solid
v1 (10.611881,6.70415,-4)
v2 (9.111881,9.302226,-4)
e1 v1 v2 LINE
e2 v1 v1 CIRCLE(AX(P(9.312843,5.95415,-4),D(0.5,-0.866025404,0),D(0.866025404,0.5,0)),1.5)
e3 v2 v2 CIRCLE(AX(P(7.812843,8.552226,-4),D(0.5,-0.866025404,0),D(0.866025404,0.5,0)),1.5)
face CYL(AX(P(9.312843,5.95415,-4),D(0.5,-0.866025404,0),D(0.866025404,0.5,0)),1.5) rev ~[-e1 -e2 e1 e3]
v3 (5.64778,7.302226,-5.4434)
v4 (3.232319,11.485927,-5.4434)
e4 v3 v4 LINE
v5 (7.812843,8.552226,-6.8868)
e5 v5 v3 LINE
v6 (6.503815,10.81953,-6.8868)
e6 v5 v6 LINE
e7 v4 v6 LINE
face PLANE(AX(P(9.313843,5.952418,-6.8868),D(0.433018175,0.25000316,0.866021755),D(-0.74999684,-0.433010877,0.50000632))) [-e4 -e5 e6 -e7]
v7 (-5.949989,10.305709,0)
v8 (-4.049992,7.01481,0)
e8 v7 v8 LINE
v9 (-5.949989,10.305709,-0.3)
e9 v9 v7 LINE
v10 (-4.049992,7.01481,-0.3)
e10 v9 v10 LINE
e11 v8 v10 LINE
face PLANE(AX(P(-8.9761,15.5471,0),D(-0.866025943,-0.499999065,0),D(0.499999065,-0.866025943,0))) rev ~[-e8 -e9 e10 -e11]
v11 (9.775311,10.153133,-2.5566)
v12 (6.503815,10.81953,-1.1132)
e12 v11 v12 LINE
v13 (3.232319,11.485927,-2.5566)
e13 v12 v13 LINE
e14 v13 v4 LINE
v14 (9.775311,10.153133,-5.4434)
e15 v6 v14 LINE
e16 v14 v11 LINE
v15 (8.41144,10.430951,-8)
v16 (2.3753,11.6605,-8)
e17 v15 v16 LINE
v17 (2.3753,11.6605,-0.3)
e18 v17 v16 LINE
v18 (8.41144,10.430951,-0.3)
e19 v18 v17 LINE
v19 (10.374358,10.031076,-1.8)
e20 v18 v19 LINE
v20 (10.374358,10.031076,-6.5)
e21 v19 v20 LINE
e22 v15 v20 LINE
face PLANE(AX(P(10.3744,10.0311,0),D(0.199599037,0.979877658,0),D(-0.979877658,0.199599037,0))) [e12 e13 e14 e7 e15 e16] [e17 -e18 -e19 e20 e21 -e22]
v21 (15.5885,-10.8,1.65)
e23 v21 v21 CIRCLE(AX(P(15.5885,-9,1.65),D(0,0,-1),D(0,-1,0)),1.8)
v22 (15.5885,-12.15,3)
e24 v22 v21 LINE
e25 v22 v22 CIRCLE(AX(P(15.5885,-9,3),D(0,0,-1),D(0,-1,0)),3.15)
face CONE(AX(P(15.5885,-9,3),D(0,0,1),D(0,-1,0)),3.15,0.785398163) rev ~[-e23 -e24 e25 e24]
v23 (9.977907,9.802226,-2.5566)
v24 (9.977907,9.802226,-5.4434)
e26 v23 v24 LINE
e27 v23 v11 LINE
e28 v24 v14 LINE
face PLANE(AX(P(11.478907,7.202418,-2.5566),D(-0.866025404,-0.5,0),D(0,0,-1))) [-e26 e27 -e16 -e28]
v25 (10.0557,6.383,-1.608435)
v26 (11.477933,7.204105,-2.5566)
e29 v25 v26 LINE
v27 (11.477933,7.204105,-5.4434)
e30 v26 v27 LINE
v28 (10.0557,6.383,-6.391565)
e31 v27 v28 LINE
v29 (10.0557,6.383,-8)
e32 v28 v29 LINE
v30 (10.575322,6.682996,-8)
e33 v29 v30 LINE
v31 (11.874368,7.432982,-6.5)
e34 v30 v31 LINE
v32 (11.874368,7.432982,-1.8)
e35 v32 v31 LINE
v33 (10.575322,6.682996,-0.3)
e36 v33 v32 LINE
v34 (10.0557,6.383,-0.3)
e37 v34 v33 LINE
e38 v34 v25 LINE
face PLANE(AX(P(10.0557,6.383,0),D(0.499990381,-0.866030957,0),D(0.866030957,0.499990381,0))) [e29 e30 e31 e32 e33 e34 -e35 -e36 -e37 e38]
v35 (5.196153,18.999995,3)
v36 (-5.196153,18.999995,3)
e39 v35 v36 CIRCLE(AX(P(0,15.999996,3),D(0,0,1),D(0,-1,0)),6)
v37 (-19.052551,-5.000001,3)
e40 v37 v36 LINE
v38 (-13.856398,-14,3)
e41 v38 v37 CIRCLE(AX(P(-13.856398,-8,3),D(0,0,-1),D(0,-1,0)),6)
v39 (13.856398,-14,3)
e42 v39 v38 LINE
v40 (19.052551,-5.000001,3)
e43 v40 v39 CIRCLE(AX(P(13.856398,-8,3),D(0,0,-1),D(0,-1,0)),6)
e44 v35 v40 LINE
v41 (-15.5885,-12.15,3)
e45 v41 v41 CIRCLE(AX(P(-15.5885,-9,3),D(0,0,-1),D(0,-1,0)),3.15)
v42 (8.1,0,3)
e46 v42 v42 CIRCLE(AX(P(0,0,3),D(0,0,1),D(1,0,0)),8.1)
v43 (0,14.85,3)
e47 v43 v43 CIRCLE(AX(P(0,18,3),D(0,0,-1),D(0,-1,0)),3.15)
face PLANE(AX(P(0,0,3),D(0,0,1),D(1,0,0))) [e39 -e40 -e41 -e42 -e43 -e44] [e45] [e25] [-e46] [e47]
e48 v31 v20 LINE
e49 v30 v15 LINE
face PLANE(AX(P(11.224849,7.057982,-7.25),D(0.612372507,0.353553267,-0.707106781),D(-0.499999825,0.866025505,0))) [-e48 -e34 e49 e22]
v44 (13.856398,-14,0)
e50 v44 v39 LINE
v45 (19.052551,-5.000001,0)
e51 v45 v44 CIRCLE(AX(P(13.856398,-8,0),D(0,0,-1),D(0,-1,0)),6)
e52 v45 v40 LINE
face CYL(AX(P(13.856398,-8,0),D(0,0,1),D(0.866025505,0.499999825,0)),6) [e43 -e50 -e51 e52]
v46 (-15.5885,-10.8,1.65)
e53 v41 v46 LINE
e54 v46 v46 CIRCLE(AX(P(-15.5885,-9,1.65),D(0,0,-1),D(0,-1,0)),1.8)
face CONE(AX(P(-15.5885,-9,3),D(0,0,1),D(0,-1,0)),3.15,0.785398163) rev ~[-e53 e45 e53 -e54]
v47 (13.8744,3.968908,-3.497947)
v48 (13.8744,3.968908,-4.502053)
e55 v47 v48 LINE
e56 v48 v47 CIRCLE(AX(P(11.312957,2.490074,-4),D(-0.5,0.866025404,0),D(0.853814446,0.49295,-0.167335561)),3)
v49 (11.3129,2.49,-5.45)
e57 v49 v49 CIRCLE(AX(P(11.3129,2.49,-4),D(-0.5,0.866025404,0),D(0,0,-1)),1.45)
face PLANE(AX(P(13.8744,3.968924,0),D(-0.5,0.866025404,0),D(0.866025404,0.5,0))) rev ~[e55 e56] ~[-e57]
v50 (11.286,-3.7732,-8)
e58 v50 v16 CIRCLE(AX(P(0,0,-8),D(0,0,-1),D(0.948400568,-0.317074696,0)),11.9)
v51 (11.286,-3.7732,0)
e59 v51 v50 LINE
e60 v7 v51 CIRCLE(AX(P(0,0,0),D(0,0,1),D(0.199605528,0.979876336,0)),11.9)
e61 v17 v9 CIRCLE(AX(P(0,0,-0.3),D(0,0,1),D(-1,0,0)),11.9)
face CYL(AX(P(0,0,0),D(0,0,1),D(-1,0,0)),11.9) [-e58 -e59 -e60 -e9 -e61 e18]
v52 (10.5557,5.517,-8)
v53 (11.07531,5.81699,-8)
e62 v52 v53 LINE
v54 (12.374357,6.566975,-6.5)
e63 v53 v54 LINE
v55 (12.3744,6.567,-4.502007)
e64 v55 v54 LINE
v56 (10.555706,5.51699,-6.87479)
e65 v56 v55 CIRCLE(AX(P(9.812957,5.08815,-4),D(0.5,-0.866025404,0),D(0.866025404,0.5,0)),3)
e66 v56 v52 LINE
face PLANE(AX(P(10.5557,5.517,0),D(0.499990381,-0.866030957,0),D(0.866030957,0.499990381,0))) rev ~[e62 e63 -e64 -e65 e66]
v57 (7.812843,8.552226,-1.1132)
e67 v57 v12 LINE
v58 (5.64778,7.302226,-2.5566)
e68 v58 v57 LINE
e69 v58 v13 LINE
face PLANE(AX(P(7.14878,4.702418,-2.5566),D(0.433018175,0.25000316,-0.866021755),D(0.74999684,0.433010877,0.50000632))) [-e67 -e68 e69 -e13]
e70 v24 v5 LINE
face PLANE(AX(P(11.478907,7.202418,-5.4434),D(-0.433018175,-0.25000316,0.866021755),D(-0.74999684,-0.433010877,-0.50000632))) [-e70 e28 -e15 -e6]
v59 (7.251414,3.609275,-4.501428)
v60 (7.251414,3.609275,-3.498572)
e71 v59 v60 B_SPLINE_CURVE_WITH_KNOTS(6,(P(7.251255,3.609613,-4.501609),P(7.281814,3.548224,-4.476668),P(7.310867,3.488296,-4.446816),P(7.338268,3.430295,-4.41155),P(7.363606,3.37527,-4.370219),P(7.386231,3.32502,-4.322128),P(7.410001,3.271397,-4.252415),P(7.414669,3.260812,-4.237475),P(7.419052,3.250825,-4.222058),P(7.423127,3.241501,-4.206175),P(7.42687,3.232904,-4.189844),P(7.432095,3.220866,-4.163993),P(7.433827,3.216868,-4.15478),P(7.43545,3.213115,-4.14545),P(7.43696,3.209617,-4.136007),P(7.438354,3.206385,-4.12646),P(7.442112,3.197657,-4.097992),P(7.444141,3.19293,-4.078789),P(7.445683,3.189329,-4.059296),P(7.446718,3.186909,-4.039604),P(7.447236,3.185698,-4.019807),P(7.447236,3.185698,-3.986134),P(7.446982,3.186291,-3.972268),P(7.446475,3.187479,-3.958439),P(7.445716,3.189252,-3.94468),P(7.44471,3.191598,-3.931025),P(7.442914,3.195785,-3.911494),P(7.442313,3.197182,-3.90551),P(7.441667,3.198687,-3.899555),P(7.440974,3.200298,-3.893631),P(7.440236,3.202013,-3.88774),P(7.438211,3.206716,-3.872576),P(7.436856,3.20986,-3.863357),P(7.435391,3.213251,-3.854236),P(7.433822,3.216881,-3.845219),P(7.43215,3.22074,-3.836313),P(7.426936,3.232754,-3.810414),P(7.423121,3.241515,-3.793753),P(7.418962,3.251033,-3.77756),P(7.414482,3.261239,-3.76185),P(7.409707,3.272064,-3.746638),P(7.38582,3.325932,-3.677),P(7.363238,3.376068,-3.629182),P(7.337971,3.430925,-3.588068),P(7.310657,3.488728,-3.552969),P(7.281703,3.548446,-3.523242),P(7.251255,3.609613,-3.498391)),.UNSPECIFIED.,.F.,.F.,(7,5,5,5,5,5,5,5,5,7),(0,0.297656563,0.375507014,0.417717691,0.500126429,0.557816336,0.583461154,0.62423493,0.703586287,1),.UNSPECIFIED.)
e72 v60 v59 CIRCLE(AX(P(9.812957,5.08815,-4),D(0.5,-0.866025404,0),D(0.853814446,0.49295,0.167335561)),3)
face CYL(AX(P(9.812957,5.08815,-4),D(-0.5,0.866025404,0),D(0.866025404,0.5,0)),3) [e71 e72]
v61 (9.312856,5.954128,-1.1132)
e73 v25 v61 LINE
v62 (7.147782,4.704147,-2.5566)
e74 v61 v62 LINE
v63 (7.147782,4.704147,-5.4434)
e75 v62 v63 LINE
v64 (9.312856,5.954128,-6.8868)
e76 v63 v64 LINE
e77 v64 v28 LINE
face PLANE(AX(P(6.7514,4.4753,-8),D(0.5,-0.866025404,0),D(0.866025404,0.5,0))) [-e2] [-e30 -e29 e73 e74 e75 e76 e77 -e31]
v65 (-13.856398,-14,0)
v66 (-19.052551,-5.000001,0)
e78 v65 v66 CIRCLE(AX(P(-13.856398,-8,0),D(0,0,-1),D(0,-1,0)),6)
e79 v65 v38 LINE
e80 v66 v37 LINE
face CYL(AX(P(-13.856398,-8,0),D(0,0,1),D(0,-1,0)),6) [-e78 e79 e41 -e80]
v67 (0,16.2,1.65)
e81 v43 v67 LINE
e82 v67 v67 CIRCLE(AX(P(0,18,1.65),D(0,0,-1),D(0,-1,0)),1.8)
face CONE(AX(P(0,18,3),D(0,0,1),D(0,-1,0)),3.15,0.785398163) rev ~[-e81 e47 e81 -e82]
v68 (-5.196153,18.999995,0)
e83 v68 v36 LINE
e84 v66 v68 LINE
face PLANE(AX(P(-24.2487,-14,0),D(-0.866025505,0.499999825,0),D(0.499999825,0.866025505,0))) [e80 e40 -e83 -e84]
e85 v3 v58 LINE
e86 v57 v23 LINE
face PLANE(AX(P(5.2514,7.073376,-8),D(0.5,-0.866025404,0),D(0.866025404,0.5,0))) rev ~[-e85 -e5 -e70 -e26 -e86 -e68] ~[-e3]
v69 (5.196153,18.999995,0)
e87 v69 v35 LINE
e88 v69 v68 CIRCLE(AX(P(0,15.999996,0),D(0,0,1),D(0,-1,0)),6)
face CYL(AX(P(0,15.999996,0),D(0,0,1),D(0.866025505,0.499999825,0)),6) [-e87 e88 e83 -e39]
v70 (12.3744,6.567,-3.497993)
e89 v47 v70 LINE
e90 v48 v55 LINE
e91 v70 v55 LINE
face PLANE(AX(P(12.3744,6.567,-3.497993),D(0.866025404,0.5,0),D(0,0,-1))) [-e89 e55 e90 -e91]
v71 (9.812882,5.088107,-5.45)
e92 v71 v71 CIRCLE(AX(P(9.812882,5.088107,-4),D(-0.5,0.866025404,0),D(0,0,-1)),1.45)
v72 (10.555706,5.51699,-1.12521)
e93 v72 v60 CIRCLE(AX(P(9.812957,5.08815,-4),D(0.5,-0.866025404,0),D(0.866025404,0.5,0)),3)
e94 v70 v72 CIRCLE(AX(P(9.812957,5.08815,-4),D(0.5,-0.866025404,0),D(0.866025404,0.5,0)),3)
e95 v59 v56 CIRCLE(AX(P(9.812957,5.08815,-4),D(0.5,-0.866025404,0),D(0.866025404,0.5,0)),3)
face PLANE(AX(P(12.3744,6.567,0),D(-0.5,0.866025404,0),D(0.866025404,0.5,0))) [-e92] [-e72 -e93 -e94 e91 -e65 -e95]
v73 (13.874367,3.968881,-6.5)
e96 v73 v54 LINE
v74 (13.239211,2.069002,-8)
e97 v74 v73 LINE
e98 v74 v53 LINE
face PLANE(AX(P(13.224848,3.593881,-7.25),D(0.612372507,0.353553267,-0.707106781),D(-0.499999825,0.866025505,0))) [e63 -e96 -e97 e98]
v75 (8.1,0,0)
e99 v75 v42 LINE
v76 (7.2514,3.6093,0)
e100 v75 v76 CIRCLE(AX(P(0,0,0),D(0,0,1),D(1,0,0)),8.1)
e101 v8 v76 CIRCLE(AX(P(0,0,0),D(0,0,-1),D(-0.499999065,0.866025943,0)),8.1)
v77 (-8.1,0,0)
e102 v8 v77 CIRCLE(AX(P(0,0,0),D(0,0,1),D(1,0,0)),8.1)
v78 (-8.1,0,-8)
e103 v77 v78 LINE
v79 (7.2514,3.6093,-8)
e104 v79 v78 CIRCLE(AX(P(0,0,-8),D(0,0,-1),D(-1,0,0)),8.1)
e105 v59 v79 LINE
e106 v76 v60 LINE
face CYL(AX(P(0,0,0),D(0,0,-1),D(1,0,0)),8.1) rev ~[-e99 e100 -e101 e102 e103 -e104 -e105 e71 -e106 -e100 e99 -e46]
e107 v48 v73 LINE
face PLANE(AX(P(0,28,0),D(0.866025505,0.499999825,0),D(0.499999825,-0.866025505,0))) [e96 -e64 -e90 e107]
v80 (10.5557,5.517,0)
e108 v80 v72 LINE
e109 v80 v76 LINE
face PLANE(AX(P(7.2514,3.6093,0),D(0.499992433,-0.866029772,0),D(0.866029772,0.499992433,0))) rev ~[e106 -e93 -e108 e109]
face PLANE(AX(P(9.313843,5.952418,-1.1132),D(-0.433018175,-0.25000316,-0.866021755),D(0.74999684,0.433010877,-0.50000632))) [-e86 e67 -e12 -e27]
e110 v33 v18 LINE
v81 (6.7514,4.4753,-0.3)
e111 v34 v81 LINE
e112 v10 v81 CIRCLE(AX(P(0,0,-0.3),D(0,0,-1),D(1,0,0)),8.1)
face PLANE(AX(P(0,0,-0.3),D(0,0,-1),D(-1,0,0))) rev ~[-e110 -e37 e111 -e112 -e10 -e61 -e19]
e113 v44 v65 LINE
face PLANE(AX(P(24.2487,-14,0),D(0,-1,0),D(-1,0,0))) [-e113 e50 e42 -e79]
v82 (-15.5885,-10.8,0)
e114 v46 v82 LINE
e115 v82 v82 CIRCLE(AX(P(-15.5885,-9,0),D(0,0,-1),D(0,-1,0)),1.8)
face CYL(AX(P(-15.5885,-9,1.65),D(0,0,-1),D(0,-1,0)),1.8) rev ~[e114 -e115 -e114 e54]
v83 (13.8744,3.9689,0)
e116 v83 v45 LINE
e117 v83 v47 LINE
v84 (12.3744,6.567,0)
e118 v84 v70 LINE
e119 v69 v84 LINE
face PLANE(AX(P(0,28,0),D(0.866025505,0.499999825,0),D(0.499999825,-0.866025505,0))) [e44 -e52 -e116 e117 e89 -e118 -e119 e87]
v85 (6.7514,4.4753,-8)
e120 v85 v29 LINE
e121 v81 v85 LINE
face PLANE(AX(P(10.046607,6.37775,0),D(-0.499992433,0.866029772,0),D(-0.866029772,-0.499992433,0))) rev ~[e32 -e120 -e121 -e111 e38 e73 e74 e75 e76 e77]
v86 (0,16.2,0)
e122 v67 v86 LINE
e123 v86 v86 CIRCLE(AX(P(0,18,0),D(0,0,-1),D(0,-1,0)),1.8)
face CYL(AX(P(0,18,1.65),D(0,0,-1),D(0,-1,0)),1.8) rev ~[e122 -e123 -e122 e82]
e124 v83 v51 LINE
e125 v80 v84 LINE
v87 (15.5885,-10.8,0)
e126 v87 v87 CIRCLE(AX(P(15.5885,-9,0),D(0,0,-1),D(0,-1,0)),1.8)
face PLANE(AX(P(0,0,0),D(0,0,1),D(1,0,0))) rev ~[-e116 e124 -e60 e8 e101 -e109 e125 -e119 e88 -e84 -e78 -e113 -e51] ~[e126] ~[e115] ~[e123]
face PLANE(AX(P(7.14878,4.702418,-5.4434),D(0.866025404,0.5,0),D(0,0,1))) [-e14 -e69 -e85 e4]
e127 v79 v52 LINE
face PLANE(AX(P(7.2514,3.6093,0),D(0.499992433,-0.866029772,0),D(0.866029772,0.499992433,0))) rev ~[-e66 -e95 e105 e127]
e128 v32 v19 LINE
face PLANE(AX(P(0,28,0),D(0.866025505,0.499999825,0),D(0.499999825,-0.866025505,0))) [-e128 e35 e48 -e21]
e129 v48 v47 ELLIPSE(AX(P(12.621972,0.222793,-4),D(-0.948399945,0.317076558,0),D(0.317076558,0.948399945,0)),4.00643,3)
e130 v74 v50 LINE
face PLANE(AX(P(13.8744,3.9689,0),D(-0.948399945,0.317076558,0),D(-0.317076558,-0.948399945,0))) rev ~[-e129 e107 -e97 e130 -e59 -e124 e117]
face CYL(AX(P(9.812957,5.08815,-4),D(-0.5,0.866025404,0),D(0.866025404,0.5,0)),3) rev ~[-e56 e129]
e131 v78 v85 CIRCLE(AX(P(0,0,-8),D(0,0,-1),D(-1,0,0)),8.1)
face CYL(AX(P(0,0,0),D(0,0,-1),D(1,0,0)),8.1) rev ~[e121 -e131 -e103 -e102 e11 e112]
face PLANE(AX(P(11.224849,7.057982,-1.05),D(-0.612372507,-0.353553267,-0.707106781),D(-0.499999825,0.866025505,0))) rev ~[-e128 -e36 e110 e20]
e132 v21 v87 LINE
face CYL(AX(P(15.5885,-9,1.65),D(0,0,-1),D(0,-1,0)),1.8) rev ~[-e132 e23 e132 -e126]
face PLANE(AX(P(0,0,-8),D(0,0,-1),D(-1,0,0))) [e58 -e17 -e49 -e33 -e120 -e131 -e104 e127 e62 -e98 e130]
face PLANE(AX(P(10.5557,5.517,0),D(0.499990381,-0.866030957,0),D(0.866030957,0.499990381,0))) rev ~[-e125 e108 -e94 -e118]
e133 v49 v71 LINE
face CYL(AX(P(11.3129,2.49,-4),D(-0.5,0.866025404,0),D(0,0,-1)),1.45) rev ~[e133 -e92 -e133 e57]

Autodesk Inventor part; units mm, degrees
ref_plane "YZ Plane" through (0, 0, 0) normal (1, 0, 0) x (0, 1, 0)
ref_plane "XZ Plane" through (0, 0, 0) normal (0, 1, 0) x (-1, 0, 0)
ref_plane "XY Plane" through (0, 0, 0) normal (0, 0, 1) x (1, 0, 0)
sketch "Sketch1" plane through (0, 0, 0) normal (0, 0, 1) x (1, 0, 0)
  circle A0 centre (0, 16) radius 2
  circle A1 centre (-13.8564, -8) radius 2
  circle A2 centre (13.8564, -8) radius 2
  line L0 (0, 28) -> (24.2487, -14)
  line L1 (24.2487, -14) -> (-24.2487, -14)
  line L2 (-24.2487, -14) -> (0, 28)
  circle A3 centre (0, 0) radius 8.1
  line L3 (0, 16) -> (13.8564, -8) construction
  line L4 (13.8564, -8) -> (-13.8564, -8) construction
  line L5 (-13.8564, -8) -> (0, 16) construction
  dimension "d0" = 16.2
  dimension "d1" = 4
  dimension "d2" = 4
  dimension "d3" = 4
  dimension "d4" = 16
  dimension "d5" = 6
extrude "Extrusion1" add sketch "Sketch1" along normal blind 3 contours A0 | A1 | A2 | L0 L1 L2
fillet "Fillet1" radius 6 3 edges at (0, 28, 1.5) (24.2487, -14, 1.5) (-24.2487, -14, 1.5)
sketch "Sketch2" plane through (0, 0, 0) normal (0, 0, -1) x (-1, 0, 0)
  circle A0 centre (0, 0) radius 8.1 projected
  arc A1 (13.8564, -14) -> (19.0526, -5) centre (13.8564, -8) ccw projected
  line L0 (5.1962, 19) -> (19.0526, -5) projected
  arc A2 (5.1962, 19) -> (-5.1962, 19) centre (0, 16) ccw projected
  line L1 (-19.0526, -5) -> (-5.1962, 19) projected
  arc A3 (-19.0526, -5) -> (-13.8564, -14) centre (-13.8564, -8) ccw projected
  line L2 (13.8564, -14) -> (-13.8564, -14) projected
  circle A4 centre (0, 0) radius 11.9
  line L3 (-10.5557, 5.517) -> (-10.0557, 6.383)
  line L4 (-10.0557, 6.383) -> (-6.7514, 4.4753)
  line L5 (-6.7514, 4.4753) -> (-7.2514, 3.6093)
  line L6 (-7.2514, 3.6093) -> (-10.5557, 5.517)
  line L7 (0, 0) -> (-7.0014, 4.0423) construction
  circle A5 centre (0, 0) radius 8.1 construction
  line L8 (-10.0557, 6.383) -> (-11.8744, 7.433)
  line L9 (-10.5557, 5.517) -> (-12.3744, 6.567)
  line L10 (-19.0526, -5) -> (-5.1962, 19) projected
  line L11 (-13.8744, 3.9689) -> (-11.286, -3.7732)
  line L12 (-10.3744, 10.0311) -> (-2.3753, 11.6605)
  point P0 (-10.3744, 10.0311)
  point P1 (-7.2514, 3.6093)
  point P2 (-12.3744, 6.567)
  point P3 (-13.8744, 3.9689)
  dimension "d9" = 3.8
  dimension "d10" = 1
  dimension "d11" = 3
  dimension "d12" = 3
extrude "Extrusion2" add sketch "Sketch2" along normal blind 8 contours A0 L4 A4 L6 | L4 L8 L1 L12 A4 | A4 L11 L1 L9 L6 picked at (10.5244, -0.9233)
sketch "Sketch3" plane through (6.7514, 4.4753, -8) normal (0.5, -0.8660254, 0) x (0.8660254, 0.5, 0)
  circle A0 centre (2.9577, 4) radius 1.5
  line L0 (0.4577, 5.4434) -> (2.9577, 6.8868)
  line L1 (2.9577, 6.8868) -> (5.4577, 5.4434)
  line L2 (5.4577, 5.4434) -> (5.4577, 2.5566)
  line L3 (5.4577, 2.5566) -> (2.9577, 1.1132)
  line L4 (2.9577, 1.1132) -> (0.4577, 2.5566)
  line L5 (0.4577, 2.5566) -> (0.4577, 5.4434)
  line L6 (5.9154, 8) -> (5.9154, 0) projected
  line L7 (5.9154, 0) -> (0, 0) projected
  point P0 (-8.0846, 8)
  point P1 (5.9154, 4)
  point P2 (2.9577, 0)
  dimension "d15" = 3
  dimension "d16" = 5
extrude "Extrusion3" cut sketch "Sketch3" against normal blind 8.75 contours A0 | L0 L1 L2 L3 L4 L5
extrude "Extrusion4" add sketch "Sketch3" against normal blind 3
sketch "Sketch4" plane through (12.3744, 6.567, 0) normal (-0.5, 0.8660254, 0) x (0.8660254, 0.5, 0)
  circle A0 centre (-2.9577, 4) radius 3
  circle A1 centre (-2.9577, 4) radius 1.5
  line L0 (-5.9154, 0) -> (-5.9154, 8) projected
  line L1 (-5.9154, 8) -> (0, 8) projected
  line L2 (0, 0) -> (0, 8) projected
  point P0 (-14, 0)
  point P1 (-5.9154, 4)
  point P2 (-2.9577, 8)
  point P3 (0, 3.4981)
  point P4 (0, 4.5019)
  dimension "d21" = 6
  dimension "d22" = 3
extrude "Extrusion5" cut sketch "Sketch4" against normal through all contours A0 L2 | L2 A0 L0 | L0 A0 | A1
extrude "Extrusion6" add sketch "Sketch4" against normal blind 3 contours L2 A0 L0 | L0 A0 | A1
sketch "Sketch5" plane through (0, 0, 0) normal (0, 0, -1) x (-1, 0, 0)
  line L0 (8.9761, 15.5471) -> (-8.9761, -15.5471)
  line L1 (-7.2514, 3.6093) -> (-12.3744, 6.567) projected
  line L2 (8.9761, 15.5471) -> (-20.2638, 11.6993)
  line L3 (-20.2638, 11.6993) -> (-8.9761, -15.5471)
  line L4 (0, 0) -> (-20.2638, 11.6993)
  line L5 (-11.8744, 7.433) -> (-6.7514, 4.4753) projected
extrude "Extrusion7" cut sketch "Sketch5" along normal blind 0.3 contours L0 L4 L2
sketch "Sketch6" plane through (0, 0, 3) normal (0, 0, 1) x (1, 0, 0)
  arc A0 (-19.0526, -5) -> (-13.8564, -14) centre (-13.8564, -8) ccw projected
  line L0 (-13.8564, -14) -> (13.8564, -14) projected
  arc A1 (13.8564, -14) -> (19.0526, -5) centre (13.8564, -8) ccw projected
  line L1 (19.0526, -5) -> (5.1962, 19) projected
  arc A2 (5.1962, 19) -> (-5.1962, 19) centre (0, 16) ccw projected
  line L2 (-5.1962, 19) -> (-19.0526, -5) projected
  circle A3 centre (0, 0) radius 8.1 projected
  line L3 (0, 0) -> (0, 18) construction
  line L4 (0, 0) -> (15.5885, -9) construction
  line L5 (0, 0) -> (-15.5885, -9) construction
  dimension "d32" = 2
  dimension "d33" = 2
  dimension "d34" = 2
hole "Hole1" at (0, 18, 3) at (15.5885, -9, 3) at (-15.5885, -9, 3) direction (0, 0, -1) diameter 3.6 end through all countersink diameter 6.3 countersink angle 90 clearance for "Flat Head Machine Screw" size "M3" standard "Ansi Metric M Profile"
sketch "Sketch7" plane through (11.3129, 2.49, -4) normal (0.5, -0.8660254, 0) x (0, 0, 1)
  arc A0 (0.5019, -2.9577) -> (-0.5019, -2.9577) centre (0, 0) ccw projected
  line L0 (-0.5019, -2.9577) -> (0.5019, -2.9577) projected
  point P0 (4, 11.0423)
hole "Hole2" at (11.3129, 2.49, -4) direction (-0.5, 0.8660254, 0) diameter 2.9 depth 7 tip angle 118 clearance for "Flat Head Machine Screw" size "M2.5" standard "Ansi Metric M Profile"
chamfer "Chamfer3" distance 1.5 angle 45 3 edges at (11.1244, 8.7321, -0.3) (11.1244, 8.7321, -8) (13.1244, 5.2679, -8)
equation "\"d33\" = d32"
equation "\"d34\" = d32"
properties part number "Motor Mount Insert"
